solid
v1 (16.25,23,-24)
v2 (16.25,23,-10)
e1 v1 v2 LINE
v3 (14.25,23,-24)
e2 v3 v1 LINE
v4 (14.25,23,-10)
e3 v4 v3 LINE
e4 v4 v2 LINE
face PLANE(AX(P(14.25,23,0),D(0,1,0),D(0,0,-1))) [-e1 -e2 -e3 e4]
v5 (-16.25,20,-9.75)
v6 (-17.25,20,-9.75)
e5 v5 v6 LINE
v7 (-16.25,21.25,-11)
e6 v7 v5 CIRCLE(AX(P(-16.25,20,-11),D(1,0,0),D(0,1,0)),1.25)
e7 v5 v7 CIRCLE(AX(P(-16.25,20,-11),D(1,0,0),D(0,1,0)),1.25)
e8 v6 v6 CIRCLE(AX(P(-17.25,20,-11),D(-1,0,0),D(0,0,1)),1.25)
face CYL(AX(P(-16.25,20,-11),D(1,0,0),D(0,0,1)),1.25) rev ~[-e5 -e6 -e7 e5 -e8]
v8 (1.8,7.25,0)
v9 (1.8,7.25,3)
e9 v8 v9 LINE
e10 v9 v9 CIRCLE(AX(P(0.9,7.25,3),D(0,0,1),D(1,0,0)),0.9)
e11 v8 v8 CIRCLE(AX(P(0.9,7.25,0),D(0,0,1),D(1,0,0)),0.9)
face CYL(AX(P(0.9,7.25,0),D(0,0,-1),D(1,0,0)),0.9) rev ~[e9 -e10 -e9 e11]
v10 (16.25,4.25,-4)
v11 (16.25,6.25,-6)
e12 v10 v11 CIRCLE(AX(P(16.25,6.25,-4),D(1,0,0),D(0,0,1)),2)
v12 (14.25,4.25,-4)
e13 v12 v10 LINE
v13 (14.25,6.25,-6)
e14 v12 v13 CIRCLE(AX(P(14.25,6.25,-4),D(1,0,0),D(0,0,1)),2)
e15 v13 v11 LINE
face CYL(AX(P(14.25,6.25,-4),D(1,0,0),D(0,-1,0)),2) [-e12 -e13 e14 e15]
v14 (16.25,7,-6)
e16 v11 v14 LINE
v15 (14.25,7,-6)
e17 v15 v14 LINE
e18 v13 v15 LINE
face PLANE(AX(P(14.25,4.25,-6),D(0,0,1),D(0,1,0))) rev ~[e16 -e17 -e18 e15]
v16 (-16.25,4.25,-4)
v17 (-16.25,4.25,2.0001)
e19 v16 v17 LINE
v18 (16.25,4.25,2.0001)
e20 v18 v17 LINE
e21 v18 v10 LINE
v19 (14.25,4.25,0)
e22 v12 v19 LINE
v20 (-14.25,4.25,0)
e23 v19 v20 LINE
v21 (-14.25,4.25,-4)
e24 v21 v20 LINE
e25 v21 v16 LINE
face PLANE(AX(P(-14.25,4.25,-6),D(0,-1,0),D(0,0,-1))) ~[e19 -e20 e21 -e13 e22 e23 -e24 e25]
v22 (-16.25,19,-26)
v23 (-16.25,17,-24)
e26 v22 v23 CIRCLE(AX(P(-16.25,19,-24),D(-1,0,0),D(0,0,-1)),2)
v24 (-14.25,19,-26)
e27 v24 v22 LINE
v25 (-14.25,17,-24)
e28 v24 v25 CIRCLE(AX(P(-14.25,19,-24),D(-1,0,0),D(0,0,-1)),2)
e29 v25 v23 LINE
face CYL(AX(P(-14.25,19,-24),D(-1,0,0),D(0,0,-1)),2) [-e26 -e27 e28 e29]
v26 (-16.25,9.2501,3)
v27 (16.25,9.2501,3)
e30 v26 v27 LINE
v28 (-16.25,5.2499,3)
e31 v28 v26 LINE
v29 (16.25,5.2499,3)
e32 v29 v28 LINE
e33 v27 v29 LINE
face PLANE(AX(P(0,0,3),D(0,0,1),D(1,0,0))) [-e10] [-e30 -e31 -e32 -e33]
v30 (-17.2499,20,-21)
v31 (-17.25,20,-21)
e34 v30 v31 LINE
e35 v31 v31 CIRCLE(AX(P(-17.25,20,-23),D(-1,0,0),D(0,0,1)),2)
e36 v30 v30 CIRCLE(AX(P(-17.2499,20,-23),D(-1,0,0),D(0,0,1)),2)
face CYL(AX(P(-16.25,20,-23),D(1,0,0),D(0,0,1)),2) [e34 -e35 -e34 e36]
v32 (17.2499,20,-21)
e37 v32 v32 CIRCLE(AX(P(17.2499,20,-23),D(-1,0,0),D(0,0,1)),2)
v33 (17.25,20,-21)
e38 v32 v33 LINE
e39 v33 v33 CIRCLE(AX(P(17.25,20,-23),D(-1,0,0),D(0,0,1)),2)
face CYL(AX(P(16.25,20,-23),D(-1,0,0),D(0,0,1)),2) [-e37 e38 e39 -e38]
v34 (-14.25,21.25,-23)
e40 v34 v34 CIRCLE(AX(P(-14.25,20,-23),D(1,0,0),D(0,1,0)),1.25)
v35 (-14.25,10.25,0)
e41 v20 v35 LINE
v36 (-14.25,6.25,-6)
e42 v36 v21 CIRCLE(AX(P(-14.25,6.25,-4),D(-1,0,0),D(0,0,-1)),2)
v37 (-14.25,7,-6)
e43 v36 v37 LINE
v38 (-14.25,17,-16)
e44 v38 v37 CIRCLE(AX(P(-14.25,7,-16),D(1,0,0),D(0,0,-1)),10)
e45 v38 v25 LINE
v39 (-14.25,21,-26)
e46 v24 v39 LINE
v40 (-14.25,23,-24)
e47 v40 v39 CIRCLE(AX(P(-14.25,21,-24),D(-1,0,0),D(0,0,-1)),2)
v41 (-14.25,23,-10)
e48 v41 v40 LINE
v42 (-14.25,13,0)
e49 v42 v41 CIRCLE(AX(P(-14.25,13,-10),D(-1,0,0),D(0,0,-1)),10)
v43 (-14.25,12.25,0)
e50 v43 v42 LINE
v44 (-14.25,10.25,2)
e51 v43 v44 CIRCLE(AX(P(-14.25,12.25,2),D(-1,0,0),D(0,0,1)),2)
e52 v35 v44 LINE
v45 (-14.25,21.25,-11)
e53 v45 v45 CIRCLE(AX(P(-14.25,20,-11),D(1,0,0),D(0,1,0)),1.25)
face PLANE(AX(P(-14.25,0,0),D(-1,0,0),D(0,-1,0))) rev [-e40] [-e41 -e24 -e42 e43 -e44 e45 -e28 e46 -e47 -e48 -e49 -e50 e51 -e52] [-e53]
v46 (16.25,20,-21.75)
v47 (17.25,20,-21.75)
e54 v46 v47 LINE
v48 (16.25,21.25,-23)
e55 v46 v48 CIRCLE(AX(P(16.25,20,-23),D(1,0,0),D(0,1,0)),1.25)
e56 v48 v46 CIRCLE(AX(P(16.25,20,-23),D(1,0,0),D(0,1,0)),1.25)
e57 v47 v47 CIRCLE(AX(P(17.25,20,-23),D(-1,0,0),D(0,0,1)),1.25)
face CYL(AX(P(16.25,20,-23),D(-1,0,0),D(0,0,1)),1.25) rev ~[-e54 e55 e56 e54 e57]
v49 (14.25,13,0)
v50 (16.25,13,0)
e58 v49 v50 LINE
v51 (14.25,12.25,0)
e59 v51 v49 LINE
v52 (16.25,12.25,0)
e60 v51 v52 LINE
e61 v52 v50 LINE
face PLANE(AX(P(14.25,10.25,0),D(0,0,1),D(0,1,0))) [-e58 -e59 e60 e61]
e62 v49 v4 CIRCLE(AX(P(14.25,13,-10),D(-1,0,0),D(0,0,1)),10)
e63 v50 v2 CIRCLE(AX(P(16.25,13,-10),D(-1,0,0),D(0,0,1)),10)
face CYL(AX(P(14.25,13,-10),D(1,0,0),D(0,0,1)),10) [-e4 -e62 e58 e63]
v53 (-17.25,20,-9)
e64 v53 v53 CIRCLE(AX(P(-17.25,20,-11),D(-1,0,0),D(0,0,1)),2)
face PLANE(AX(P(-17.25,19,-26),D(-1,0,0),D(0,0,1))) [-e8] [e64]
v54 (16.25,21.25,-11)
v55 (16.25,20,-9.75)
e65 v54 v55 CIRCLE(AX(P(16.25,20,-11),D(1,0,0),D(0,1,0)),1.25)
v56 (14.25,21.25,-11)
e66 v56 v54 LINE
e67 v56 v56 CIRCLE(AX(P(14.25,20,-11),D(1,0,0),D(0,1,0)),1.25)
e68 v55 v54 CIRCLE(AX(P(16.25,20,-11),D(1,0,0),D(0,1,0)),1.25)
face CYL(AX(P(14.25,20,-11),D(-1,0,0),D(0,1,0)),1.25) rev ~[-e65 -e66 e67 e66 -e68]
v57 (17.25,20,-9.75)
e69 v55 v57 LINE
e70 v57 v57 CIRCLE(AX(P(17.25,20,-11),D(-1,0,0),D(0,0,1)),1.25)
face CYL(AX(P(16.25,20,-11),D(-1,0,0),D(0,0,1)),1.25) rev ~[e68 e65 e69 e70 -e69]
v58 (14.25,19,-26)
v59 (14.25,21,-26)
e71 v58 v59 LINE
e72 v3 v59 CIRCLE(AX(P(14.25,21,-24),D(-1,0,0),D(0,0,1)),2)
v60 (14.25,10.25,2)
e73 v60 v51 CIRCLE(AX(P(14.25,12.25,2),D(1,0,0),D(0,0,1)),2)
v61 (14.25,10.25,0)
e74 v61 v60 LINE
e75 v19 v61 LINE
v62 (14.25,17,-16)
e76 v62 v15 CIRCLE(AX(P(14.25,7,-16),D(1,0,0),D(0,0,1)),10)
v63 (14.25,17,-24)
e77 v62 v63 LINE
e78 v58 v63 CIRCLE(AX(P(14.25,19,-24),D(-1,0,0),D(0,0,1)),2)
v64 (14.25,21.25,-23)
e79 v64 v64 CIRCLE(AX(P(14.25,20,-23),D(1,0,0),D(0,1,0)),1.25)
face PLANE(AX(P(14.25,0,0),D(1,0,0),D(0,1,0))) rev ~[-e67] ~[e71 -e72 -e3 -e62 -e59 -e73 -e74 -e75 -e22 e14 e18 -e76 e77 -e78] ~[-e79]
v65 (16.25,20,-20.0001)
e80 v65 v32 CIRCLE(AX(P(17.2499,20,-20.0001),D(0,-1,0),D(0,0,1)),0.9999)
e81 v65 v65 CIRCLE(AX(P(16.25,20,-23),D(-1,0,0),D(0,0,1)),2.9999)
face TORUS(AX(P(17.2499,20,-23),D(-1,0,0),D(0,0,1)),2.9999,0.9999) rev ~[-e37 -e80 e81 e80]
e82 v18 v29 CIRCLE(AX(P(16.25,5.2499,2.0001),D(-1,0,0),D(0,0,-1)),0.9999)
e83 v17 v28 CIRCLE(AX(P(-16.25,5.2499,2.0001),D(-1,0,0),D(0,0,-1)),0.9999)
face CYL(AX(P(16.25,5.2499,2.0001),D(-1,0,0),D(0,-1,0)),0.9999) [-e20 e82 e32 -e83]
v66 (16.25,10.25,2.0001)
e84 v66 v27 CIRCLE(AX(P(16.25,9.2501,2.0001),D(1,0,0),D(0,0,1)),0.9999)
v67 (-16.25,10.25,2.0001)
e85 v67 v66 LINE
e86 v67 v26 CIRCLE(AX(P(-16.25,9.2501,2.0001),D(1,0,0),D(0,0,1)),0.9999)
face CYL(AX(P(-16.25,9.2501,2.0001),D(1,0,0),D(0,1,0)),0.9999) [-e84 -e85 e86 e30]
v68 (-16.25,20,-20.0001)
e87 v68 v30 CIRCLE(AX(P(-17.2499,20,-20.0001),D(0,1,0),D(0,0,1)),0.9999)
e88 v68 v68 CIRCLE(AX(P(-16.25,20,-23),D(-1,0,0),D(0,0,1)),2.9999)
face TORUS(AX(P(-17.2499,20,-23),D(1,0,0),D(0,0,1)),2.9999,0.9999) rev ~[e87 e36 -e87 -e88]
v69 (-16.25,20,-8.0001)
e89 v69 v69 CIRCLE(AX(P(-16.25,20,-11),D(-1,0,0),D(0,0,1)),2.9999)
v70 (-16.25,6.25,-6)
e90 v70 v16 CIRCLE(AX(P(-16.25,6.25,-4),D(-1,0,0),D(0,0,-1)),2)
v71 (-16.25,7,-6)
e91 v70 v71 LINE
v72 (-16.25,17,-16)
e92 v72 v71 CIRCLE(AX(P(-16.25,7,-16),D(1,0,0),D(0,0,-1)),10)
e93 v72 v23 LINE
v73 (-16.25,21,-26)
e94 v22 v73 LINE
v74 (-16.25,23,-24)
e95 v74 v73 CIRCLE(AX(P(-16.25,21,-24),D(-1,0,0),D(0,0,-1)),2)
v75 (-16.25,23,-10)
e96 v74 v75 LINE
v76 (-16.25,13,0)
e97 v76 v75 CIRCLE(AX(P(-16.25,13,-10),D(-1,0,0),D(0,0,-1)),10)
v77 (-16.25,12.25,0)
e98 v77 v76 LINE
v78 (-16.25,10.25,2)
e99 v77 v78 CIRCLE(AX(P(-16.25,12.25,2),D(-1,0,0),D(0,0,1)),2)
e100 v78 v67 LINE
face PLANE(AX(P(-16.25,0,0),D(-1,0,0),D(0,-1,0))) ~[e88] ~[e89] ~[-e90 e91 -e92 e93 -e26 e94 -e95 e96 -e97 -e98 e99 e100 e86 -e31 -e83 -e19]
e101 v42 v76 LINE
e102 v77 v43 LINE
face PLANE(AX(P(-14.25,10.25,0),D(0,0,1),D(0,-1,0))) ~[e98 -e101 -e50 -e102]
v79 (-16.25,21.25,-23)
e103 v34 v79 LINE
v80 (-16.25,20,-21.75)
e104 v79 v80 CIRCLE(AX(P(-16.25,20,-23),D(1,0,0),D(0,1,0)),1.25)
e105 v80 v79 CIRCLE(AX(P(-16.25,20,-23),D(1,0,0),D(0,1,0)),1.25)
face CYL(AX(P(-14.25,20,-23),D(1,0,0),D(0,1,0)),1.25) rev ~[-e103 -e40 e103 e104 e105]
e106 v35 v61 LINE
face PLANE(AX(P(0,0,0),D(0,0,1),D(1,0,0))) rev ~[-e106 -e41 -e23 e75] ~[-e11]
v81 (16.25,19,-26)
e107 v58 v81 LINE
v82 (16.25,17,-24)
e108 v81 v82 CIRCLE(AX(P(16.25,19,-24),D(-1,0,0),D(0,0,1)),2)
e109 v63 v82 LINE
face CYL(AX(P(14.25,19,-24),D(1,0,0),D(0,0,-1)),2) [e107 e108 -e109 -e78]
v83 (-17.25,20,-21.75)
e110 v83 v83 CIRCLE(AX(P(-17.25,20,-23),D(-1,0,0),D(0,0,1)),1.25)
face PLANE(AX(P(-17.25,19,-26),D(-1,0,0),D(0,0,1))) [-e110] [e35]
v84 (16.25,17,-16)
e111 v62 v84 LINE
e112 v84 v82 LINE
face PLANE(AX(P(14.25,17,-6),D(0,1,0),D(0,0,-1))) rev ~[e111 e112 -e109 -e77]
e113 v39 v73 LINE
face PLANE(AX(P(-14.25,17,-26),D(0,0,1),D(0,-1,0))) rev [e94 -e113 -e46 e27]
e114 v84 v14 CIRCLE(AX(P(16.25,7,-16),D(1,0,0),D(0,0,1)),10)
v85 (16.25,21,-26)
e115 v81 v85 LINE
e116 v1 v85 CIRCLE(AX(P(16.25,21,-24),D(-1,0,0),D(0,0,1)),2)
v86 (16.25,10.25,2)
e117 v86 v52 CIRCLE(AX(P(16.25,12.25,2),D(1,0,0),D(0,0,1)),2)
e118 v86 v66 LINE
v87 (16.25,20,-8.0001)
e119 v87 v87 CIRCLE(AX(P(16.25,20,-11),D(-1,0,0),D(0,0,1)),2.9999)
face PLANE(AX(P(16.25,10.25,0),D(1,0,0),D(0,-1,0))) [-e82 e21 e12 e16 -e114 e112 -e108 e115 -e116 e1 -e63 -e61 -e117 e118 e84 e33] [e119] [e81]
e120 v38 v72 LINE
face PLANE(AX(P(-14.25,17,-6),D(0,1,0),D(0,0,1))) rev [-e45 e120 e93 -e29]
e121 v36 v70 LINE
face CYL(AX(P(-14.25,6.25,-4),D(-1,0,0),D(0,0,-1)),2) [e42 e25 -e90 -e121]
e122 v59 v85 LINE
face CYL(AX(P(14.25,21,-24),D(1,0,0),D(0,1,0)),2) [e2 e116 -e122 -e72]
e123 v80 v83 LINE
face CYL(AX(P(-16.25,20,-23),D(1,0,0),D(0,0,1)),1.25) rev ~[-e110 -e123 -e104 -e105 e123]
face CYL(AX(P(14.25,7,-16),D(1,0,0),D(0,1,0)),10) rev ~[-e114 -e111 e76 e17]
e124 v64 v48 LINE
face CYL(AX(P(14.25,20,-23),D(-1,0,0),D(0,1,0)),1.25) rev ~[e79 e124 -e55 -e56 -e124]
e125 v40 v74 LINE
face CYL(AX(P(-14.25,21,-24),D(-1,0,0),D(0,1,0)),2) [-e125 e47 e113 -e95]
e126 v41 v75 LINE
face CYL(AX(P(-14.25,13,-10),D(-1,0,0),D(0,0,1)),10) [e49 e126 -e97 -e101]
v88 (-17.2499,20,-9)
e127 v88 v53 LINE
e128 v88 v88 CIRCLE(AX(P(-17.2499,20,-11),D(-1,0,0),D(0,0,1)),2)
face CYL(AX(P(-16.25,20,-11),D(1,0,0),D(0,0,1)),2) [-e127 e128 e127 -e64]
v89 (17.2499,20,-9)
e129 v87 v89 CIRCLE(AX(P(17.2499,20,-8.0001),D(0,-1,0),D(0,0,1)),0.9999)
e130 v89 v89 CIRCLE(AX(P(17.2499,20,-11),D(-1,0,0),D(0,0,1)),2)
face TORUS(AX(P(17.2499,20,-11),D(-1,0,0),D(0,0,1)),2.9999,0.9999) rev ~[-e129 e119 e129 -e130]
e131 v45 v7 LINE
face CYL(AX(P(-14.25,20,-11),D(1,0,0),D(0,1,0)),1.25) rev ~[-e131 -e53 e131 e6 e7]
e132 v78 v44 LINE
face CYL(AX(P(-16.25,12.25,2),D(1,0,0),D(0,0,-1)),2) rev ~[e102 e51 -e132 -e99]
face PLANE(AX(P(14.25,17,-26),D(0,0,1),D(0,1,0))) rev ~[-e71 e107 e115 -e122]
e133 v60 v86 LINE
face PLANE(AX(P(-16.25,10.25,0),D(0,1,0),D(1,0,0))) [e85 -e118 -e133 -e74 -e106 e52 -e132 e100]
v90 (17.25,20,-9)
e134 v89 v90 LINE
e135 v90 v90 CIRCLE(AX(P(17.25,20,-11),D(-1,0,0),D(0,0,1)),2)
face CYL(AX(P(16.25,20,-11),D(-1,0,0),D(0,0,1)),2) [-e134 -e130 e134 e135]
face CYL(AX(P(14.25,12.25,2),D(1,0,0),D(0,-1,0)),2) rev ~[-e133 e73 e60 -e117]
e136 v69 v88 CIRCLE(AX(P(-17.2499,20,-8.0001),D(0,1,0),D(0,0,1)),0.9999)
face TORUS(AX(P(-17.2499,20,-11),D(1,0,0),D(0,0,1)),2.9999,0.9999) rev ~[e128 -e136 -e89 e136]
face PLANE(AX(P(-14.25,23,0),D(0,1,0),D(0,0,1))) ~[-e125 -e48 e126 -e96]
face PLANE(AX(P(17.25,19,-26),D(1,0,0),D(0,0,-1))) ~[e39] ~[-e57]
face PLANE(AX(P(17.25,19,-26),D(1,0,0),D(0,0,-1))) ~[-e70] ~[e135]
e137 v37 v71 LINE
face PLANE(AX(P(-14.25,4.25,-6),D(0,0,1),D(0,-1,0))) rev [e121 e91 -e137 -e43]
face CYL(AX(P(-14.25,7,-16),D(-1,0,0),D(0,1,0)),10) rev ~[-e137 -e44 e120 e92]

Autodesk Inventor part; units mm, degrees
ref_plane "XZ Plane" through (0, 0, 0) normal (0, 1, 0) x (-1, 0, 0)
ref_plane "XY Plane" through (0, 0, 0) normal (0, 0, 1) x (1, 0, 0)
sketch "Sketch1" plane through (0, 0, 0) normal (0, 0, 1) x (1, 0, 0)
  circle A0 centre (-11, 0) radius 1.25 construction
  circle A1 centre (11, 0) radius 1.25 construction
  circle A2 centre (0, -8) radius 12.25 construction
  circle A3 centre (-11, 24) radius 1.5 construction
  circle A4 centre (11, 24) radius 1.5 construction
  line L0 (-14.25, 27.25) -> (14.25, 27.25) construction
  line L1 (14.25, 27.25) -> (14.25, -19.25) construction
  line L2 (14.25, -19.25) -> (-14.25, -19.25) construction
  line L3 (-14.25, -19.25) -> (-14.25, 27.25) construction
  line L4 (-16.25, 10.25) -> (16.25, 10.25)
  line L5 (16.25, 10.25) -> (16.25, 4.25)
  line L6 (16.25, 4.25) -> (-16.25, 4.25)
  line L7 (-16.25, 4.25) -> (-16.25, 10.25)
  circle A5 centre (0.9, 7.25) radius 0.9
  line L8 (0, 4.25) -> (0, 10.25) construction
  circle A6 centre (0, -8) radius 9.5 construction
  point P0 (0, 0)
  point P1 (0, 27.25)
  point P2 (16.25, 7.25)
  dimension "d0" = 2.5
  dimension "d1" = 2.5
  dimension "d2" = 22
  dimension "d3" = 11
  dimension "d4" = 8
  dimension "d5" = 24.5
  dimension "d6" = 3
  dimension "d7" = 3
  dimension "d8" = 24
  dimension "d9" = 28.5
  dimension "d10" = 3.25
  dimension "d11" = 46.5
  dimension "d12" = 2
  dimension "d13" = 6
  dimension "d14" = 1.8
  dimension "d15" = 19
extrude "Extrusion1" add sketch "Sketch1" along normal blind 3
ref_plane "Work Plane1" through (14.25, 0, 0) normal (1, 0, 0) x (0, 1, 0)
sketch "Sketch2" plane through (14.25, 0, 0) normal (1, 0, 0) x (0, 1, 0)
  line L0 (4.25, 0) -> (10.25, 0) projected
  circle A0 centre (20, -11) radius 1.25
  circle A1 centre (20, -23) radius 1.25
  line L1 (17, -26) -> (23, -26)
  line L2 (23, -26) -> (23, -6)
  line L3 (23, -6) -> (17, -6) construction
  line L4 (17, -6) -> (17, -26)
  line L5 (4.25, 0) -> (23, 0)
  line L6 (23, 0) -> (23, -6)
  line L7 (23, -6) -> (4.25, -6) construction
  line L8 (4.25, -6) -> (4.25, 0)
  line L9 (4.25, -6) -> (17, -6)
  point P0 (0, 0)
  point P1 (27.25, 0)
  point P2 (27.25, 0)
  point P3 (27.25, 0)
  point P4 (20, -26)
  dimension "d19" = 7.25
  dimension "d20" = 11
  dimension "d21" = 12
  dimension "d22" = 2.5
  dimension "d23" = 2.5
  dimension "d24" = 3
  dimension "d25" = 3
  dimension "d26" = 6
extrude "Extrusion2" add sketch "Sketch2" along normal up to surface (2 mm away)
fillet "Fillet1" radius 10 2 edges at (15.25, 17, -6) (15.25, 23, 0)
fillet "Fillet1" radius 2 4 edges at (15.25, 4.25, -6) (15.25, 17, -26) (15.25, 23, -26) (15.25, 10.25, 0)
mirror "Mirror1" about plane through (0, 0, 0) normal (1, 0, 0) of "Extrusion2", "Fillet1"
fillet "Fillet2" radius 1 2 edges at (0, 10.25, 3) (0, 4.25, 3)
sketch "Sketch3" plane through (-16.25, 19, -26) normal (-1, 0, 0) x (0, 0, 1)
  arc A0 (2, 4) -> (0, 2) centre (2, 2) ccw construction
  line L0 (2, 4) -> (16, 4) construction
  arc A1 (26, -6) -> (16, 4) centre (16, -6) ccw construction
  line L1 (26, -6) -> (26, -6.75) construction
  arc A2 (26, -6.75) -> (28, -8.75) centre (28, -6.75) ccw construction
  arc A3 (29, -9.75) -> (28, -8.75) centre (28, -9.75) ccw construction
  line L2 (29, -9.75) -> (29, -13.75) construction
  arc A4 (28, -14.75) -> (29, -13.75) centre (28, -13.75) ccw construction
  line L3 (28, -14.75) -> (22, -14.75) construction
  arc A5 (20, -12.75) -> (22, -14.75) centre (22, -12.75) ccw construction
  line L4 (20, -12.75) -> (20, -12) construction
  arc A6 (20, -12) -> (10, -2) centre (10, -12) ccw construction
  line L5 (10, -2) -> (2, -2) construction
  arc A7 (0, 0) -> (2, -2) centre (2, 0) ccw construction
  line L6 (0, 0) -> (0, 2) construction
  circle A8 centre (15, 1) radius 1.25 projected
  circle A9 centre (3, 1) radius 1.25 construction
  circle A10 centre (3, 1) radius 1.25 projected
  circle A11 centre (3, 1) radius 2
  circle A12 centre (15, 1) radius 2
  point P0 (26, -19)
  dimension "d32" = 4
  dimension "d33" = 4
extrude "Extrusion3" add sketch "Sketch3" along normal blind 1
fillet "Fillet3" radius 1 2 edges at (-16.25, 20, -25) (-16.25, 20, -13)
mirror "Mirror2" about plane through (0, 0, 0) normal (1, 0, 0) of "Extrusion3", "Fillet3"
equation "\"d3\" = 0.5 * d2"
equation "\"d7\" = d6"
equation "\"d23\" = d22"
equation "\"d25\" = d24"
equation "\"d33\" = d32"
properties part number "Tendon_Center"
